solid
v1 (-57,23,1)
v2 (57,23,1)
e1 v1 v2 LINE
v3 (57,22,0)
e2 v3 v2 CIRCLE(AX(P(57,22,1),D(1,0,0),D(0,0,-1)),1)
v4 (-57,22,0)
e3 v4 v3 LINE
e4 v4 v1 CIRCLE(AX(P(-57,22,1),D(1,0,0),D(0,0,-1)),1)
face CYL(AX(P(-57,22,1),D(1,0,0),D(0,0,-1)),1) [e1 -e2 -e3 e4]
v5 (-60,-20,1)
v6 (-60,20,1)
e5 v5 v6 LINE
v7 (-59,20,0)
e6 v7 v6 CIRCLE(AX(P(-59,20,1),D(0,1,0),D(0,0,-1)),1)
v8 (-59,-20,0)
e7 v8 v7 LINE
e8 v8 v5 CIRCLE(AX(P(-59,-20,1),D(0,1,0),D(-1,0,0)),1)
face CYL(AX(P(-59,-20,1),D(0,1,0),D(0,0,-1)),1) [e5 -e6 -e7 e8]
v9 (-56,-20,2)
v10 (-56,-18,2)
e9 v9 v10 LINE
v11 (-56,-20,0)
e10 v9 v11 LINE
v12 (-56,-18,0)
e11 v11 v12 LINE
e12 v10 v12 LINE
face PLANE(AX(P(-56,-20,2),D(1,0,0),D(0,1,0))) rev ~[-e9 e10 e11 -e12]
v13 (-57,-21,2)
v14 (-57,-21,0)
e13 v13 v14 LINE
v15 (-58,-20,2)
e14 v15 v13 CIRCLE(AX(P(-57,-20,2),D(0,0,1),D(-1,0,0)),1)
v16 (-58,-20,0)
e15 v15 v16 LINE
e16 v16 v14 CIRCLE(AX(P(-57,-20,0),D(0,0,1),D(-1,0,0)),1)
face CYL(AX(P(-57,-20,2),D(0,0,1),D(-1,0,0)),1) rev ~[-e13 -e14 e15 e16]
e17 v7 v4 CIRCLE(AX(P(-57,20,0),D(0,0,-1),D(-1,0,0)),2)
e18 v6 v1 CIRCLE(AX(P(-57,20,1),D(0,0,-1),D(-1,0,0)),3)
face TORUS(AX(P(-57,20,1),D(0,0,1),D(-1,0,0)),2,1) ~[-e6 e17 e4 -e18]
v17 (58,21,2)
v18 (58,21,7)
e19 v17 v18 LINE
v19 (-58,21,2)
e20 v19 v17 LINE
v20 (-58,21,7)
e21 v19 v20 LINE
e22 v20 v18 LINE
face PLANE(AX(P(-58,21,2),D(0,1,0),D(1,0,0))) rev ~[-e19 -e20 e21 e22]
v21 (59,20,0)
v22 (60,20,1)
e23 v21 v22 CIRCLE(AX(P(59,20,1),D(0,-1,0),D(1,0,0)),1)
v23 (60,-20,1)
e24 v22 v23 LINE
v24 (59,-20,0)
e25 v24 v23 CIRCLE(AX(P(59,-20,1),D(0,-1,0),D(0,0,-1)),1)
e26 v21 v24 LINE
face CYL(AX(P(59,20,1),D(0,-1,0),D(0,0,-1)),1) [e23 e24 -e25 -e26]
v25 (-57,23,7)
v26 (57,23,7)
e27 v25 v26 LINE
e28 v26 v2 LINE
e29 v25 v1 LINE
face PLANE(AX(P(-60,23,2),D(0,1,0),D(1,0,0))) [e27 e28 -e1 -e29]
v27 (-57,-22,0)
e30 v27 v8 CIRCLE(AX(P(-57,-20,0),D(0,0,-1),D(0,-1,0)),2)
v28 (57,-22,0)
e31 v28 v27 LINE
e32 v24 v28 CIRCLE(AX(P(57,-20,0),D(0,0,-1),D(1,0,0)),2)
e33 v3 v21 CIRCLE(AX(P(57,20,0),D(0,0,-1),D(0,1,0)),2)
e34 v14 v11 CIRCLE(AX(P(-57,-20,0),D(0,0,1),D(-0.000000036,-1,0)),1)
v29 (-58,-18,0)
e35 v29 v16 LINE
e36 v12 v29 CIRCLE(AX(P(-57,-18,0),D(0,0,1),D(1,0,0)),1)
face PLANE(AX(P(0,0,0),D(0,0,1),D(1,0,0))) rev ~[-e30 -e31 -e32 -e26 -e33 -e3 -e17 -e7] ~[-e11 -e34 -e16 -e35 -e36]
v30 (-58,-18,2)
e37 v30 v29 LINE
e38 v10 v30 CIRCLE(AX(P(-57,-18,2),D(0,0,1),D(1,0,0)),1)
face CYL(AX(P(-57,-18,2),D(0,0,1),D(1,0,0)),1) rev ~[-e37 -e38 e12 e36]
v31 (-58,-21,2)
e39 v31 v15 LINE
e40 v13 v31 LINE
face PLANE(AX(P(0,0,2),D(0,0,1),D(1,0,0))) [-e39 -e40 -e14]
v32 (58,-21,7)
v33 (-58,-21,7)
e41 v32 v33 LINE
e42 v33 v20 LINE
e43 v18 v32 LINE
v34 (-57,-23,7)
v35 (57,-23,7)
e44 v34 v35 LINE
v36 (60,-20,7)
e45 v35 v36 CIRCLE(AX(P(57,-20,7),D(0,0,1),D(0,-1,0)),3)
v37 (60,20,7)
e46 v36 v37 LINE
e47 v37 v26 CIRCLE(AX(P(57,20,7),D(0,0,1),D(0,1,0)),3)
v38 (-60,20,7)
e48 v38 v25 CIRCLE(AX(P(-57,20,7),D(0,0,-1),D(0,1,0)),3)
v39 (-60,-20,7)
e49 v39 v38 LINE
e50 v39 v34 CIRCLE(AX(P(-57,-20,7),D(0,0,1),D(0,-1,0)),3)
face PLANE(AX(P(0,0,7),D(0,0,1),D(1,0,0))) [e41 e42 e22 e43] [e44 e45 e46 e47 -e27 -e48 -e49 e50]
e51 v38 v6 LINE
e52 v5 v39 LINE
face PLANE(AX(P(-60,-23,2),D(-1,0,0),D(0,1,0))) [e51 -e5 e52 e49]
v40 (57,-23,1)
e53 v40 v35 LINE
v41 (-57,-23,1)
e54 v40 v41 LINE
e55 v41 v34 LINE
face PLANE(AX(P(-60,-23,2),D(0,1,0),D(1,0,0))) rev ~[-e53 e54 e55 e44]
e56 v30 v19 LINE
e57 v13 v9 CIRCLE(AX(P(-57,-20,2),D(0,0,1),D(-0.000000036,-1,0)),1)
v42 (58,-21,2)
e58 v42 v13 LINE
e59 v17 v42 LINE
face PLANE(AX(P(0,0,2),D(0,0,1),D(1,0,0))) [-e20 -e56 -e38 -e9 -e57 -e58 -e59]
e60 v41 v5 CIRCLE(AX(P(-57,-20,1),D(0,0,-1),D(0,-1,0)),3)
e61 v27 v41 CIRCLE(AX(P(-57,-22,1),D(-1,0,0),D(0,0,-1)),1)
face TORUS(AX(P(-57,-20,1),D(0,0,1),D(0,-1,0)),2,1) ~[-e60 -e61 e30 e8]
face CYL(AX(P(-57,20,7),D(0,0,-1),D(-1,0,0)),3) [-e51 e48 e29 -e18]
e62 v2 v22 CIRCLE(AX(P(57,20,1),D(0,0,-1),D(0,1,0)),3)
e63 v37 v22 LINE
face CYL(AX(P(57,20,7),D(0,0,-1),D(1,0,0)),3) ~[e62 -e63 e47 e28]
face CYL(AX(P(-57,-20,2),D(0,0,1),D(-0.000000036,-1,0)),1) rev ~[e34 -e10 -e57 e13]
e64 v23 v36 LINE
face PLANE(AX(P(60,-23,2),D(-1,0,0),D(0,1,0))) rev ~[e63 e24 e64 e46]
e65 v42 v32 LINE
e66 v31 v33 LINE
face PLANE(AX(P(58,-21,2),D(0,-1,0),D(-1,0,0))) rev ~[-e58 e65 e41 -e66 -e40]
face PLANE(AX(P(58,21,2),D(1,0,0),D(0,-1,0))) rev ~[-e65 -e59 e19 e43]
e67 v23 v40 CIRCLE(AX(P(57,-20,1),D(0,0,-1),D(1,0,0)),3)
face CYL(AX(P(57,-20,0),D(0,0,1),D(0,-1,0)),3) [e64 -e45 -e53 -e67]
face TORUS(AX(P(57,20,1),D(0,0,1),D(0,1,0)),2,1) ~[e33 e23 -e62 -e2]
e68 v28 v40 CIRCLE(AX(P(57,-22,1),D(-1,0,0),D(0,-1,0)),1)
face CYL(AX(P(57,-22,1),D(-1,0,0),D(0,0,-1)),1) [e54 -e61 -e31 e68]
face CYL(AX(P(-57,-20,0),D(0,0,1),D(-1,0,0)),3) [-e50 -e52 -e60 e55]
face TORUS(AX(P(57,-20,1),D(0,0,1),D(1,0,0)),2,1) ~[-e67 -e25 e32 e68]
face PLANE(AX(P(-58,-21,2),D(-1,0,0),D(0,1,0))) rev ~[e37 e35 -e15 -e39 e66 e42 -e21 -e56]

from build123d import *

# Parameters (mm, degrees)
F0_W     = 120
F0_H     = 46
F1_DEPTH = 2
F2_W     = 120
F2_H     = 46
F3_DEPTH = 5
F4_R     = 3
F5_R     = 1
F6_DEPTH = 25


with BuildPart() as f1:
    # F0 (on Top) → F1 (new body)
    with BuildSketch(Plane.XY):
        Rectangle(F0_W, F0_H)
    extrude(amount=F1_DEPTH)

    # F2 (on face) → F3 (join)
    with BuildSketch(Plane.XY.offset(2)):
        Rectangle(F2_W, F2_H)
        Polygon((58, 21), (58, -21), (-57.0000000355, -21), (-58, -21), (-58, -20), (-58, -18), (-58, 21), align=None, mode=Mode.SUBTRACT)
    extrude(amount=F3_DEPTH)

    # F4
    f4_edges = [f1.edges().sort_by_distance(p)[0] for p in [
        (-60, 23, 3.5),
        (-60, -23, 3.5),
        (60, 23, 3.5),
        (60, -23, 3.5),
    ]]
    fillet(f4_edges, radius=F4_R)

    # F5
    f5_edges = [f1.edges().sort_by_distance(p)[0] for p in [
        (0, 23, 0),
        (-59.12132, 22.12132, 0),
        (-60, 0, 0),
        (-59.12132, -22.12132, 0),
        (0, -23, 0),
        (60, 0, 0),
        (59.12132, 22.12132, 0),
        (59.12132, -22.12132, 0),
    ]]
    fillet(f5_edges, radius=F5_R)

    # F2 (on face) → F6 (cut)
    with BuildSketch(Plane.XY.offset(2)):
        with BuildLine():
            ThreePointArc((-56, -18), (-57, -17), (-58, -18))
            ThreePointArc((-58, -18), (-57.7071067812, -18.7071067812), (-57, -19))
            ThreePointArc((-57, -19), (-56.2928932188, -18.7071067812), (-56, -18))
        make_face()
        with BuildLine():
            ThreePointArc((-57, -19), (-56.2928932188, -19.2928932188), (-56, -20))
            Line((-56, -20), (-56, -18))
            ThreePointArc((-56, -18), (-56.2928932188, -18.7071067812), (-57, -19))
        make_face()
        with BuildLine():
            Line((-58, -18), (-58, -20))
            ThreePointArc((-58, -20), (-57.7071067812, -19.2928932188), (-57, -19))
            ThreePointArc((-57, -19), (-57.7071067812, -18.7071067812), (-58, -18))
        make_face()
        with BuildLine():
            ThreePointArc((-58, -20), (-57.7071067937, -20.7071067687), (-57.0000000355, -21))
            ThreePointArc((-57.0000000355, -21), (-56.2928932313, -20.7071067937), (-56, -20))
            ThreePointArc((-56, -20), (-56.2928932188, -19.2928932188), (-57, -19))
            ThreePointArc((-57, -19), (-57.7071067812, -19.2928932188), (-58, -20))
        make_face()
    extrude(amount=-F6_DEPTH, mode=Mode.SUBTRACT)


solid = f1.part
